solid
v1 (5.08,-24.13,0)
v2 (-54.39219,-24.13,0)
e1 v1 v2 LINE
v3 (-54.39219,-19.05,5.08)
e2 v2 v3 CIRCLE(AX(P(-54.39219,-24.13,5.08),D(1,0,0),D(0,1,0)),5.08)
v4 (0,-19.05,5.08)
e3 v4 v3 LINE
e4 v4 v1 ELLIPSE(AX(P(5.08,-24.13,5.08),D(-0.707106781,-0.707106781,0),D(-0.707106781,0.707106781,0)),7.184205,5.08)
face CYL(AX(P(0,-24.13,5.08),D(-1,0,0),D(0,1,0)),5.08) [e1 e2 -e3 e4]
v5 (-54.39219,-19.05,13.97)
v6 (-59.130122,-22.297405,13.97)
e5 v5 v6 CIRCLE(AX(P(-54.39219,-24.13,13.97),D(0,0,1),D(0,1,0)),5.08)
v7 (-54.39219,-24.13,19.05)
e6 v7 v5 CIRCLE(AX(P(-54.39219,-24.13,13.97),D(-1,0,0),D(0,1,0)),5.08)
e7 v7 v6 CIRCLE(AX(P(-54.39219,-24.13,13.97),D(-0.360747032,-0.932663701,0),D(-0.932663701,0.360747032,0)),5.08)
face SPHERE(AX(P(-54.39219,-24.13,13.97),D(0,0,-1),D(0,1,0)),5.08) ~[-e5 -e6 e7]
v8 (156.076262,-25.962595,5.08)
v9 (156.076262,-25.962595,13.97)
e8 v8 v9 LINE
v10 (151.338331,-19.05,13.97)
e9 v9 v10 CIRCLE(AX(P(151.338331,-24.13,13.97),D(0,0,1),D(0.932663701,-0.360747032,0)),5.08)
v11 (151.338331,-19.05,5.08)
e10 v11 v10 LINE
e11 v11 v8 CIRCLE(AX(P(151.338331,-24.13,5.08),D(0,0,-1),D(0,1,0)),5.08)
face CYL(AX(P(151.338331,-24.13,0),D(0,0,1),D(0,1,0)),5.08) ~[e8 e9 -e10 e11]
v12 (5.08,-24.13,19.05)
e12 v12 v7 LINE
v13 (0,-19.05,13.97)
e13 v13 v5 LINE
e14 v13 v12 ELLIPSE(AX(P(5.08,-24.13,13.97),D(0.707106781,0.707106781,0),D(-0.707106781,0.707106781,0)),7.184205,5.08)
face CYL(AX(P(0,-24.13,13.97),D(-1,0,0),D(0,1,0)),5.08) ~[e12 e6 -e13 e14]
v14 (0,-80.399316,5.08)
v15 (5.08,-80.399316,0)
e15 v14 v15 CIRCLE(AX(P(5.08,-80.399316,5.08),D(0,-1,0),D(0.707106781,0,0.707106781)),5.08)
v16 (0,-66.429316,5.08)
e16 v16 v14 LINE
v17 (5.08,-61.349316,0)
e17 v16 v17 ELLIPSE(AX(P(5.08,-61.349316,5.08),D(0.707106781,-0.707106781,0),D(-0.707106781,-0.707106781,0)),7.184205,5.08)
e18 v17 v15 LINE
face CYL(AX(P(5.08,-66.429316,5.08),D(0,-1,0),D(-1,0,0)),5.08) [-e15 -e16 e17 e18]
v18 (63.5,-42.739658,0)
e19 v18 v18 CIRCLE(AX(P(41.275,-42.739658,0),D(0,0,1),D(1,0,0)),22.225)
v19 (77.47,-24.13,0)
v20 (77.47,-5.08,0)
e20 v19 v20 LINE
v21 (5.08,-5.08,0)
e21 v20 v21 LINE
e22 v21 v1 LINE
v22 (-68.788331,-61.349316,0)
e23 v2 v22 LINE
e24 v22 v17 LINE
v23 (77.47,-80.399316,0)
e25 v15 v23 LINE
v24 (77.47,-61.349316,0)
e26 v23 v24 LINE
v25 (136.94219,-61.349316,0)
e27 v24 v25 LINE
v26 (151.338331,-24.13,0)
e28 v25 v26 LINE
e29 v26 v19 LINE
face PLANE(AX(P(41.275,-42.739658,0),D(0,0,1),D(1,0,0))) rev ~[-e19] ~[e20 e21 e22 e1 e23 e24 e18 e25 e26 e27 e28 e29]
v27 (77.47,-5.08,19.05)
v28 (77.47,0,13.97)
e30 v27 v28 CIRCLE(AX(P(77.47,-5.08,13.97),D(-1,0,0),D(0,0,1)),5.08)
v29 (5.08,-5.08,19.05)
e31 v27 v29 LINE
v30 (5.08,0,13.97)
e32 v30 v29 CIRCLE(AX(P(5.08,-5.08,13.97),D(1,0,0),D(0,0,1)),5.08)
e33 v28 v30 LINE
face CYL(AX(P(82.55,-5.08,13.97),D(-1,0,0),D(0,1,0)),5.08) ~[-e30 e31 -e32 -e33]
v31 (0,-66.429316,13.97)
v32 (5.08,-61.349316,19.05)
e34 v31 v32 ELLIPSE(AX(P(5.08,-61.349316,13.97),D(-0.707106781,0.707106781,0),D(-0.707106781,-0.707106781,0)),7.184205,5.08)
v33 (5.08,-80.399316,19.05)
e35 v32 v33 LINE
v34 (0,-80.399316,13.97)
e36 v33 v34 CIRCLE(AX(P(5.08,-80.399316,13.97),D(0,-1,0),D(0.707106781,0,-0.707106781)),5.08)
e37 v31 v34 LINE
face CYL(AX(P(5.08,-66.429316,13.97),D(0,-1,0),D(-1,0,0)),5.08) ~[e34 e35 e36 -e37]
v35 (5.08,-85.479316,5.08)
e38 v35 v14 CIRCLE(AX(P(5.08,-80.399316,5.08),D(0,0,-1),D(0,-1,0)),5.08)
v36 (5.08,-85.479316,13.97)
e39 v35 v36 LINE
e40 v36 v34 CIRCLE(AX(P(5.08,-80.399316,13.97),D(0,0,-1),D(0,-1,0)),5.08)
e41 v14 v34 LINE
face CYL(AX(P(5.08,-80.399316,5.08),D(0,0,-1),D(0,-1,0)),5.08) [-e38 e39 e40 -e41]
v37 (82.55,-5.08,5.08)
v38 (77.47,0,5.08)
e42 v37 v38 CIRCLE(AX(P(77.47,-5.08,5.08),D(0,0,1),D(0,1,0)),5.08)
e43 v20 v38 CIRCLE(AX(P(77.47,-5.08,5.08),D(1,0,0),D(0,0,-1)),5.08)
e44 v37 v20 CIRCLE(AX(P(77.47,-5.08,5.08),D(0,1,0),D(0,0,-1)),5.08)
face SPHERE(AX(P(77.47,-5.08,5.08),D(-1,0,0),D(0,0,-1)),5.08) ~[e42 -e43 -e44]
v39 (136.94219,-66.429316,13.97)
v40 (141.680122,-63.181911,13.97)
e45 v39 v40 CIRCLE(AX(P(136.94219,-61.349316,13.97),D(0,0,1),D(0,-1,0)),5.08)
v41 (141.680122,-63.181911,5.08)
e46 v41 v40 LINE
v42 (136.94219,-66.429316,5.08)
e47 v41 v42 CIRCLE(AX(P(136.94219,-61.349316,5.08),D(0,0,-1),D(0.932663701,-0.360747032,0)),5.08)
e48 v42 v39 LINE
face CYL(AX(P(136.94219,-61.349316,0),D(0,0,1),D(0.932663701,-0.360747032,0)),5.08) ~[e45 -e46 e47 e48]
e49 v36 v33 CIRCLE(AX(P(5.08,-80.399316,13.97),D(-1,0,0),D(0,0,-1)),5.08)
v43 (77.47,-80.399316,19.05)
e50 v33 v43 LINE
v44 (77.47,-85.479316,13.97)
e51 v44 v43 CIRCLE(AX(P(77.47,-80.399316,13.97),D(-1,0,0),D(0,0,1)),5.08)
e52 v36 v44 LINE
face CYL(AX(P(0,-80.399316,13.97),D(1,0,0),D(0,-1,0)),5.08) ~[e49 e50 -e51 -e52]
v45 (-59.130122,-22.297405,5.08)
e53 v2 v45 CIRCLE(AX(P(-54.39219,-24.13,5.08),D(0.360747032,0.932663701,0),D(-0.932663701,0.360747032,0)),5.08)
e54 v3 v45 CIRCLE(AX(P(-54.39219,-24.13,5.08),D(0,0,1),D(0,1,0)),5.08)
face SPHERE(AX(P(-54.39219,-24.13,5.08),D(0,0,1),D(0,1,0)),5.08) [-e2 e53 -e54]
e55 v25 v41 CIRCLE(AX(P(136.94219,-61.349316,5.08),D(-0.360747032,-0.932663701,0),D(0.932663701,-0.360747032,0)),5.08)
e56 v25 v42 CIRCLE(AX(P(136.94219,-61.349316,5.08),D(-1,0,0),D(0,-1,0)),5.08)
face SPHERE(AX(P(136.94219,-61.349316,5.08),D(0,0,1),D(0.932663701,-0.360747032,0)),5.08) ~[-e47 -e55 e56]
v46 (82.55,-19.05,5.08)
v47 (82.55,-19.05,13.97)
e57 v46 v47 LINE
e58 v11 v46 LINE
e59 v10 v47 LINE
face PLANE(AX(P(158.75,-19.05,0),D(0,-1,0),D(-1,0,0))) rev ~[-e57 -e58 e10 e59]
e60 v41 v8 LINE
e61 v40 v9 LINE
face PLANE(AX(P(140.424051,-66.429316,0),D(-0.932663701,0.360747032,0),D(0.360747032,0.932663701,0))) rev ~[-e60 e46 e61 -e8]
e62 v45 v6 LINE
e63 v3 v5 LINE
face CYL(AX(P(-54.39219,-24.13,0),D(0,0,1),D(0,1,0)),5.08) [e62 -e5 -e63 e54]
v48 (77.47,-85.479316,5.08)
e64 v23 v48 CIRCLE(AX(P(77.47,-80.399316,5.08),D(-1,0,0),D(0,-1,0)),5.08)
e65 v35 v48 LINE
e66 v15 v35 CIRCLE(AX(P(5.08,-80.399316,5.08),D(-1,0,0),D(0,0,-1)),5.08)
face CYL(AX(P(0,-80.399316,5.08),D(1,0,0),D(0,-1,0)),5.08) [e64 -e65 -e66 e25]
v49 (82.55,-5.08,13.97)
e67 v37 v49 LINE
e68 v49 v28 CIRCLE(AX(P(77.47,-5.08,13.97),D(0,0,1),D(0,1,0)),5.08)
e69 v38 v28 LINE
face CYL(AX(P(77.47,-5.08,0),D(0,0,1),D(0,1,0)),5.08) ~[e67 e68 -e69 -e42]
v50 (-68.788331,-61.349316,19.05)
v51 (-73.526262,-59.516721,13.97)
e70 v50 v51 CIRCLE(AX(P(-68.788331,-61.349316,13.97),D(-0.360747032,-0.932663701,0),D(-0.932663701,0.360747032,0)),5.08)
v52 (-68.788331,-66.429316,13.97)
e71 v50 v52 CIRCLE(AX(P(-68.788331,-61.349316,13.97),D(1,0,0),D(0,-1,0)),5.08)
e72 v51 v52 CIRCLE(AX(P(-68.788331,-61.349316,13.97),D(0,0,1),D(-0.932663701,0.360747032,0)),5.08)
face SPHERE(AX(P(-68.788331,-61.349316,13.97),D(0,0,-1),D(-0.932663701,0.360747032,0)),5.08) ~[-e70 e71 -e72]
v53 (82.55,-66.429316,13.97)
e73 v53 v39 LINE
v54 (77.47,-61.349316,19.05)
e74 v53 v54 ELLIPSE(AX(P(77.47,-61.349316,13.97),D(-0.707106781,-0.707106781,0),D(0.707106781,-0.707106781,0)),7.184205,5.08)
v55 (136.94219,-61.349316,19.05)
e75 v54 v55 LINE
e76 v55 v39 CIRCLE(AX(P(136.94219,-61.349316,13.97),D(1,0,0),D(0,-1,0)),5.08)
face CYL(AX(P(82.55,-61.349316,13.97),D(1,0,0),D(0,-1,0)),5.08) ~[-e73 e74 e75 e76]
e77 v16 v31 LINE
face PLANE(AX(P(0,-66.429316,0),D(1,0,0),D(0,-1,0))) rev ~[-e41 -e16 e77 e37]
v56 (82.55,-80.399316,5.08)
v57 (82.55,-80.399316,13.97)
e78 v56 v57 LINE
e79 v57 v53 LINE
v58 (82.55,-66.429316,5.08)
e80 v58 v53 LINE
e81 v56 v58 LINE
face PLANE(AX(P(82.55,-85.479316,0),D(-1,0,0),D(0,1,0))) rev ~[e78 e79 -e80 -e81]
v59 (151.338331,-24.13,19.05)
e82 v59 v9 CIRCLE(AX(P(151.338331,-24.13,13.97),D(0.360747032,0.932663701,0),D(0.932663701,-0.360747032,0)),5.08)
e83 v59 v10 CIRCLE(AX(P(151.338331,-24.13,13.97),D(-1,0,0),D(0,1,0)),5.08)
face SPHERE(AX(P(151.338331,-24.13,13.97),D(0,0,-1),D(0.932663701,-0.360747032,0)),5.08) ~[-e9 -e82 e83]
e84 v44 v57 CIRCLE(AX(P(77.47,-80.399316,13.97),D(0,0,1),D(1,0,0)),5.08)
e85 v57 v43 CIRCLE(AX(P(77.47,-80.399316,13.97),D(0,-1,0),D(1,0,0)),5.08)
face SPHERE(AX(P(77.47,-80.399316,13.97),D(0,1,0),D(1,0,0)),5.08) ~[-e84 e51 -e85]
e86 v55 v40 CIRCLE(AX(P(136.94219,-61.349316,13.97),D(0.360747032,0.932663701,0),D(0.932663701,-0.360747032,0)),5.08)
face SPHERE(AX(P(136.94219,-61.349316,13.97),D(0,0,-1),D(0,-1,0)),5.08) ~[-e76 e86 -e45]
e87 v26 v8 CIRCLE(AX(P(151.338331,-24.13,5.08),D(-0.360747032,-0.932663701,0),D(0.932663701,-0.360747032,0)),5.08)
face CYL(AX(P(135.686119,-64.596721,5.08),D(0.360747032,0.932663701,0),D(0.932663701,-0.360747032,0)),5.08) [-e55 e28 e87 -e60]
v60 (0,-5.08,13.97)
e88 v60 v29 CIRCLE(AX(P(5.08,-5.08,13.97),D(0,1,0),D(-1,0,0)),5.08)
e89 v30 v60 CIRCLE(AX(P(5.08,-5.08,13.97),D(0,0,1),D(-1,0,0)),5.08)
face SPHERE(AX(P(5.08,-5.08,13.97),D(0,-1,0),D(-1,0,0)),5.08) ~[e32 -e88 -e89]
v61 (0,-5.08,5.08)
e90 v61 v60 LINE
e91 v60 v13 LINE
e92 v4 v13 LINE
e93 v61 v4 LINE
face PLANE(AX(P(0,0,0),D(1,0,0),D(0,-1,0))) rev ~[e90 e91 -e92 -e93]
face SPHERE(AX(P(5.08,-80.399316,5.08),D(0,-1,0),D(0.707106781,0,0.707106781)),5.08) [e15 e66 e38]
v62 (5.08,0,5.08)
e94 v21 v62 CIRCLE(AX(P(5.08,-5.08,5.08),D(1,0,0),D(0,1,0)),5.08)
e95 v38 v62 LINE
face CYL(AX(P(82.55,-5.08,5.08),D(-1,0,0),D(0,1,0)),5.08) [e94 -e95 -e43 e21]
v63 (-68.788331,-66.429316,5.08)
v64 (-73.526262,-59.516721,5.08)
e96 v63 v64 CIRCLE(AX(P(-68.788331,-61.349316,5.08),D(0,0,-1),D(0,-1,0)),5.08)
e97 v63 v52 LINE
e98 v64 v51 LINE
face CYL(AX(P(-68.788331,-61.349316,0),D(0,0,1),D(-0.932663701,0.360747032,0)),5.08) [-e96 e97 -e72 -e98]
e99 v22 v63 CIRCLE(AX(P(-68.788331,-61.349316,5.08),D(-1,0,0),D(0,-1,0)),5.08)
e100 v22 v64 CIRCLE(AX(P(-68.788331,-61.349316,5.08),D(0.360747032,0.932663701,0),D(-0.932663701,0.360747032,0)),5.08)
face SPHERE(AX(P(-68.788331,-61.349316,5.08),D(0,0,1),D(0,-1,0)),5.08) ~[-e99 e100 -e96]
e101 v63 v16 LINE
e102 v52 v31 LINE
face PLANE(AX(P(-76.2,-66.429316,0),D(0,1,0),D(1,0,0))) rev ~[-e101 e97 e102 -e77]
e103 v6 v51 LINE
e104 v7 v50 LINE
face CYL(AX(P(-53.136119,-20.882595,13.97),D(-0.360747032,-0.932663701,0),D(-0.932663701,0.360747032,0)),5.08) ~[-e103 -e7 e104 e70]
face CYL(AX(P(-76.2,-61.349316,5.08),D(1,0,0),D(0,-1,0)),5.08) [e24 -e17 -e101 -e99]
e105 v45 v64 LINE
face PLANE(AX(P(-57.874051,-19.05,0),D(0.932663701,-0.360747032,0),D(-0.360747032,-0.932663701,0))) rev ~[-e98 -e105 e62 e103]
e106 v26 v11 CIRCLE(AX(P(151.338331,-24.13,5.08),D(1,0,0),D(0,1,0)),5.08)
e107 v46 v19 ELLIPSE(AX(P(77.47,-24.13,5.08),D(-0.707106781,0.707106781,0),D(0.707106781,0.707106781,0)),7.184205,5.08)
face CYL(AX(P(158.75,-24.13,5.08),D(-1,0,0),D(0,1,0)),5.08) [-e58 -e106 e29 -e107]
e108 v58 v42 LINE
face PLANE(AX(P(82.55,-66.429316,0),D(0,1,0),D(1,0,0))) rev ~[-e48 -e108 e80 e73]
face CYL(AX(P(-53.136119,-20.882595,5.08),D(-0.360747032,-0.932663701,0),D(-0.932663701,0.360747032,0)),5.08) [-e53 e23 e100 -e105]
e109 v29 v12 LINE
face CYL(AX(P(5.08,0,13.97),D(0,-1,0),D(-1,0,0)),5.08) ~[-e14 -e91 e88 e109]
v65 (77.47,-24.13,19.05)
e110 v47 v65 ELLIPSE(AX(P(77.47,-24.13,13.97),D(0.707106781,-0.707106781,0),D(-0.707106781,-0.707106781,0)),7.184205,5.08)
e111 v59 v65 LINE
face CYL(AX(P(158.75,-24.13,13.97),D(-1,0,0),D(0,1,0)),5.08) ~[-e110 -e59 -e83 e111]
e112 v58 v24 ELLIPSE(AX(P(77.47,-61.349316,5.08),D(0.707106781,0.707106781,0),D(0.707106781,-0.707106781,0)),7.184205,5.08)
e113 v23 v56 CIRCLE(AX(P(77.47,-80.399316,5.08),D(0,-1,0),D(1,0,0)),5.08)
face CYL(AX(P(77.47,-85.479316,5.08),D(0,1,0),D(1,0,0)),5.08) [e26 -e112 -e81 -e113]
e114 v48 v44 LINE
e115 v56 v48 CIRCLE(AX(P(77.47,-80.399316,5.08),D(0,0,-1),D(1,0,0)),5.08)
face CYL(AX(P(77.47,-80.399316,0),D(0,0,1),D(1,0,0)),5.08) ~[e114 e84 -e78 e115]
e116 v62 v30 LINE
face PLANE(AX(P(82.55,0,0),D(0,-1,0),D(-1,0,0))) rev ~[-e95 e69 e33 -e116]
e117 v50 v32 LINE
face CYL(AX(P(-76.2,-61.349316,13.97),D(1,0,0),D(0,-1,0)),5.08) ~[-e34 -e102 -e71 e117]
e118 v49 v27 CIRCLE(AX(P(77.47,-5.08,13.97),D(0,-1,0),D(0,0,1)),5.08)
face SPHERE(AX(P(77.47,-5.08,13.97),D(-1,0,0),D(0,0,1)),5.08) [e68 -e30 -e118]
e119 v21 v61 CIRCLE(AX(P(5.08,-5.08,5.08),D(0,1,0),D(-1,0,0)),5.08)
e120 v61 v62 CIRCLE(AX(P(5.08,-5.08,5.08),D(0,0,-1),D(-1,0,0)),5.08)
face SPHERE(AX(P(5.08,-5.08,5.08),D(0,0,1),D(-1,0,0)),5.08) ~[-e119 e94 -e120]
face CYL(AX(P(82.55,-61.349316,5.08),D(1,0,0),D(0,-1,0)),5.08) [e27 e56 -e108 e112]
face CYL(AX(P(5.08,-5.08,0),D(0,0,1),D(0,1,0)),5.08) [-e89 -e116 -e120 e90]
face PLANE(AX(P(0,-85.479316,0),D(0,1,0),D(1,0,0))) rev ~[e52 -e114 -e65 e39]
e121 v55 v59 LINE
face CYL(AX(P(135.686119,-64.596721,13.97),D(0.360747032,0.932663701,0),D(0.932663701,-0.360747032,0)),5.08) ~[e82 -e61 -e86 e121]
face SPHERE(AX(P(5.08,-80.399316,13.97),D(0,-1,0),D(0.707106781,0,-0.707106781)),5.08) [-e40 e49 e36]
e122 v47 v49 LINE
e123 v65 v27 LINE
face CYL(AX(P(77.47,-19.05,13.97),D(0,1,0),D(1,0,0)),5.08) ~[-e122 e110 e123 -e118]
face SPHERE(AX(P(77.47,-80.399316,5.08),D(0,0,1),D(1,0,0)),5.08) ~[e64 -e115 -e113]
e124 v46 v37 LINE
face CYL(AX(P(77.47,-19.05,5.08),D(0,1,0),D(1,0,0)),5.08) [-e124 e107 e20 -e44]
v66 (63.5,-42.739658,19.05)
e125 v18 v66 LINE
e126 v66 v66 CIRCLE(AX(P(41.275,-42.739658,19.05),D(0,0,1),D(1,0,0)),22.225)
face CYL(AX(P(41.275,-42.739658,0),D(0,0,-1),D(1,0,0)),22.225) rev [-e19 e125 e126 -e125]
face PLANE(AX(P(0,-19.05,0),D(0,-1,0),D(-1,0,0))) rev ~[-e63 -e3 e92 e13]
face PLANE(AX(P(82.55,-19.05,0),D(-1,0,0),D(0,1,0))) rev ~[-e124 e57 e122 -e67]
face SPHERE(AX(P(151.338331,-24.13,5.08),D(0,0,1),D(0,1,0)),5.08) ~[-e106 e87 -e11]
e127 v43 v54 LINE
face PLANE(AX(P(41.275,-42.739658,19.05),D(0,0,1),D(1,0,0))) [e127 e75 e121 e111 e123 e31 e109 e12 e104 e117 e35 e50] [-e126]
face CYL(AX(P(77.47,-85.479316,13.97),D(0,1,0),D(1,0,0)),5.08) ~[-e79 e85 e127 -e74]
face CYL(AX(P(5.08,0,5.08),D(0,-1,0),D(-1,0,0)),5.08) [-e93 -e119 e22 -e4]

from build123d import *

# Parameters (mm, degrees)
F0_R         = 22.225
F1_DEPTH     = 19.05
F2_R         = 5.08
F3_T1_DEPTH  = 8.89
F3_S5_W      = 5.08
F3_S5_H      = 5.08
F3_T6_DEPTH  = 5.08
F3_S11_W     = 5.08
F3_S11_H     = 5.08
F3_T12_DEPTH = 5.08


# Not quite as in the source:
# - a fillet or chamfer that OpenCascade refuses, or shapes differently, is made with other operations: its cross-section is extruded or revolved along the edge and cut away or added


with BuildPart() as f1:
    # F0 (on Top) → F1 (new body)
    with BuildSketch(Plane.XY):
        Polygon((82.55, 0), (0, 0), (0, -19.05), (-57.8740507578, -19.05), (-76.2, -66.4293159973), (0, -66.4293159973), (0, -85.4793159973), (82.55, -85.4793159973), (82.55, -66.4293159973), (140.4240507578, -66.4293159973), (158.75, -19.05), (82.55, -19.05), align=None)
        with Locations((41.275, -42.7396579986)):
            Circle(F0_R, mode=Mode.SUBTRACT)
    extrude(amount=F1_DEPTH)

    # F2
    f2_edges = [f1.edges().sort_by_distance(p)[0] for p in [
        (111.487025, -66.429316, 19.05),
        (149.587025, -42.739658, 19.05),
        (120.65, -19.05, 19.05),
        (149.587025, -42.739658, 0),
        (111.487025, -66.429316, 0),
        (158.75, -19.05, 9.525),
        (140.424051, -66.429316, 9.525),
        (82.55, -75.954316, 19.05),
        (82.55, -85.479316, 9.525),
        (82.55, -75.954316, 0),
        (41.275, -85.479316, 0),
        (41.275, -85.479316, 19.05),
        (0, -75.954316, 19.05),
        (0, -75.954316, 0),
        (-38.1, -66.429316, 19.05),
        (-76.2, -66.429316, 9.525),
        (-38.1, -66.429316, 0),
        (-67.037025, -42.739658, 19.05),
        (-67.037025, -42.739658, 0),
        (-57.874051, -19.05, 9.525),
        (-28.937025, -19.05, 0),
        (-28.937025, -19.05, 19.05),
        (0, -9.525, 19.05),
        (0, 0, 9.525),
        (0, -9.525, 0),
        (41.275, 0, 19.05),
        (41.275, 0, 0),
        (82.55, -9.525, 19.05),
        (82.55, -9.525, 0),
        (120.65, -19.05, 0),
        (82.55, 0, 9.525),
    ]]
    fillet(f2_edges, radius=F2_R)

    # F3: fillet of radius 5.08 on 1 edges, made by hand

    # F3_s2 → F3_t1 (cut)
    with BuildSketch(Plane.XY.offset(5.08)):
        with BuildLine():
            ThreePointArc((5.08, -85.4793159973), (1.4878975516, -83.9914184457), (0, -80.3993159973))
            Line((0, -80.3993159973), (0, -85.4793159973))
            Line((0, -85.4793159973), (5.08, -85.4793159973))
        make_face()
    extrude(amount=F3_T1_DEPTH, mode=Mode.SUBTRACT)


with BuildPart() as f3_tool4:
    # F3_s5 → F3_t6 (new body)
    with BuildSketch(Plane.XZ.offset(80.3993159973)):
        with Locations((2.54, 2.54)):
            Rectangle(F3_S5_W, F3_S5_H)
    extrude(amount=F3_T6_DEPTH)

    # F3_s7 → F3_t8 (revolve, cut)
    with BuildSketch(Plane(origin=(5.08, -80.3993159973, 5.08), x_dir=(0.7071067812, 0, 0.7071067812), z_dir=(0.7071067812, 0, -0.7071067812))):
        with BuildLine():
            ThreePointArc((0, -5.08), (5.08, 0), (0, 5.08))
            Line((0, 5.08), (0, -5.08))
        make_face()
    revolve(axis=Axis((5.08, -80.3993159973, 5.08), (0, -1, 0)), mode=Mode.SUBTRACT)


with BuildPart() as f1_1:
    add(f1.part)

    # F3_t3: cut F3_tool4
    add(f3_tool4.part, mode=Mode.SUBTRACT)


with BuildPart() as f3_tool10:
    # F3_s11 → F3_t12 (new body)
    with BuildSketch(Plane.XZ.offset(80.3993159973)):
        with Locations((2.54, 16.51)):
            Rectangle(F3_S11_W, F3_S11_H)
    extrude(amount=F3_T12_DEPTH)

    # F3_s13 → F3_t14 (revolve, cut)
    with BuildSketch(Plane(origin=(5.08, -80.3993159973, 13.97), x_dir=(0.7071067812, 0, -0.7071067812), z_dir=(-0.7071067812, 0, -0.7071067812))):
        with BuildLine():
            ThreePointArc((0, -5.08), (5.08, 0), (0, 5.08))
            Line((0, 5.08), (0, -5.08))
        make_face()
    revolve(axis=Axis((5.08, -80.3993159973, 13.97), (0, -1, 0)), mode=Mode.SUBTRACT)


with BuildPart() as f1_2:
    add(f1_1.part)

    # F3_t9: cut F3_tool10
    add(f3_tool10.part, mode=Mode.SUBTRACT)


solid = f1_2.part
